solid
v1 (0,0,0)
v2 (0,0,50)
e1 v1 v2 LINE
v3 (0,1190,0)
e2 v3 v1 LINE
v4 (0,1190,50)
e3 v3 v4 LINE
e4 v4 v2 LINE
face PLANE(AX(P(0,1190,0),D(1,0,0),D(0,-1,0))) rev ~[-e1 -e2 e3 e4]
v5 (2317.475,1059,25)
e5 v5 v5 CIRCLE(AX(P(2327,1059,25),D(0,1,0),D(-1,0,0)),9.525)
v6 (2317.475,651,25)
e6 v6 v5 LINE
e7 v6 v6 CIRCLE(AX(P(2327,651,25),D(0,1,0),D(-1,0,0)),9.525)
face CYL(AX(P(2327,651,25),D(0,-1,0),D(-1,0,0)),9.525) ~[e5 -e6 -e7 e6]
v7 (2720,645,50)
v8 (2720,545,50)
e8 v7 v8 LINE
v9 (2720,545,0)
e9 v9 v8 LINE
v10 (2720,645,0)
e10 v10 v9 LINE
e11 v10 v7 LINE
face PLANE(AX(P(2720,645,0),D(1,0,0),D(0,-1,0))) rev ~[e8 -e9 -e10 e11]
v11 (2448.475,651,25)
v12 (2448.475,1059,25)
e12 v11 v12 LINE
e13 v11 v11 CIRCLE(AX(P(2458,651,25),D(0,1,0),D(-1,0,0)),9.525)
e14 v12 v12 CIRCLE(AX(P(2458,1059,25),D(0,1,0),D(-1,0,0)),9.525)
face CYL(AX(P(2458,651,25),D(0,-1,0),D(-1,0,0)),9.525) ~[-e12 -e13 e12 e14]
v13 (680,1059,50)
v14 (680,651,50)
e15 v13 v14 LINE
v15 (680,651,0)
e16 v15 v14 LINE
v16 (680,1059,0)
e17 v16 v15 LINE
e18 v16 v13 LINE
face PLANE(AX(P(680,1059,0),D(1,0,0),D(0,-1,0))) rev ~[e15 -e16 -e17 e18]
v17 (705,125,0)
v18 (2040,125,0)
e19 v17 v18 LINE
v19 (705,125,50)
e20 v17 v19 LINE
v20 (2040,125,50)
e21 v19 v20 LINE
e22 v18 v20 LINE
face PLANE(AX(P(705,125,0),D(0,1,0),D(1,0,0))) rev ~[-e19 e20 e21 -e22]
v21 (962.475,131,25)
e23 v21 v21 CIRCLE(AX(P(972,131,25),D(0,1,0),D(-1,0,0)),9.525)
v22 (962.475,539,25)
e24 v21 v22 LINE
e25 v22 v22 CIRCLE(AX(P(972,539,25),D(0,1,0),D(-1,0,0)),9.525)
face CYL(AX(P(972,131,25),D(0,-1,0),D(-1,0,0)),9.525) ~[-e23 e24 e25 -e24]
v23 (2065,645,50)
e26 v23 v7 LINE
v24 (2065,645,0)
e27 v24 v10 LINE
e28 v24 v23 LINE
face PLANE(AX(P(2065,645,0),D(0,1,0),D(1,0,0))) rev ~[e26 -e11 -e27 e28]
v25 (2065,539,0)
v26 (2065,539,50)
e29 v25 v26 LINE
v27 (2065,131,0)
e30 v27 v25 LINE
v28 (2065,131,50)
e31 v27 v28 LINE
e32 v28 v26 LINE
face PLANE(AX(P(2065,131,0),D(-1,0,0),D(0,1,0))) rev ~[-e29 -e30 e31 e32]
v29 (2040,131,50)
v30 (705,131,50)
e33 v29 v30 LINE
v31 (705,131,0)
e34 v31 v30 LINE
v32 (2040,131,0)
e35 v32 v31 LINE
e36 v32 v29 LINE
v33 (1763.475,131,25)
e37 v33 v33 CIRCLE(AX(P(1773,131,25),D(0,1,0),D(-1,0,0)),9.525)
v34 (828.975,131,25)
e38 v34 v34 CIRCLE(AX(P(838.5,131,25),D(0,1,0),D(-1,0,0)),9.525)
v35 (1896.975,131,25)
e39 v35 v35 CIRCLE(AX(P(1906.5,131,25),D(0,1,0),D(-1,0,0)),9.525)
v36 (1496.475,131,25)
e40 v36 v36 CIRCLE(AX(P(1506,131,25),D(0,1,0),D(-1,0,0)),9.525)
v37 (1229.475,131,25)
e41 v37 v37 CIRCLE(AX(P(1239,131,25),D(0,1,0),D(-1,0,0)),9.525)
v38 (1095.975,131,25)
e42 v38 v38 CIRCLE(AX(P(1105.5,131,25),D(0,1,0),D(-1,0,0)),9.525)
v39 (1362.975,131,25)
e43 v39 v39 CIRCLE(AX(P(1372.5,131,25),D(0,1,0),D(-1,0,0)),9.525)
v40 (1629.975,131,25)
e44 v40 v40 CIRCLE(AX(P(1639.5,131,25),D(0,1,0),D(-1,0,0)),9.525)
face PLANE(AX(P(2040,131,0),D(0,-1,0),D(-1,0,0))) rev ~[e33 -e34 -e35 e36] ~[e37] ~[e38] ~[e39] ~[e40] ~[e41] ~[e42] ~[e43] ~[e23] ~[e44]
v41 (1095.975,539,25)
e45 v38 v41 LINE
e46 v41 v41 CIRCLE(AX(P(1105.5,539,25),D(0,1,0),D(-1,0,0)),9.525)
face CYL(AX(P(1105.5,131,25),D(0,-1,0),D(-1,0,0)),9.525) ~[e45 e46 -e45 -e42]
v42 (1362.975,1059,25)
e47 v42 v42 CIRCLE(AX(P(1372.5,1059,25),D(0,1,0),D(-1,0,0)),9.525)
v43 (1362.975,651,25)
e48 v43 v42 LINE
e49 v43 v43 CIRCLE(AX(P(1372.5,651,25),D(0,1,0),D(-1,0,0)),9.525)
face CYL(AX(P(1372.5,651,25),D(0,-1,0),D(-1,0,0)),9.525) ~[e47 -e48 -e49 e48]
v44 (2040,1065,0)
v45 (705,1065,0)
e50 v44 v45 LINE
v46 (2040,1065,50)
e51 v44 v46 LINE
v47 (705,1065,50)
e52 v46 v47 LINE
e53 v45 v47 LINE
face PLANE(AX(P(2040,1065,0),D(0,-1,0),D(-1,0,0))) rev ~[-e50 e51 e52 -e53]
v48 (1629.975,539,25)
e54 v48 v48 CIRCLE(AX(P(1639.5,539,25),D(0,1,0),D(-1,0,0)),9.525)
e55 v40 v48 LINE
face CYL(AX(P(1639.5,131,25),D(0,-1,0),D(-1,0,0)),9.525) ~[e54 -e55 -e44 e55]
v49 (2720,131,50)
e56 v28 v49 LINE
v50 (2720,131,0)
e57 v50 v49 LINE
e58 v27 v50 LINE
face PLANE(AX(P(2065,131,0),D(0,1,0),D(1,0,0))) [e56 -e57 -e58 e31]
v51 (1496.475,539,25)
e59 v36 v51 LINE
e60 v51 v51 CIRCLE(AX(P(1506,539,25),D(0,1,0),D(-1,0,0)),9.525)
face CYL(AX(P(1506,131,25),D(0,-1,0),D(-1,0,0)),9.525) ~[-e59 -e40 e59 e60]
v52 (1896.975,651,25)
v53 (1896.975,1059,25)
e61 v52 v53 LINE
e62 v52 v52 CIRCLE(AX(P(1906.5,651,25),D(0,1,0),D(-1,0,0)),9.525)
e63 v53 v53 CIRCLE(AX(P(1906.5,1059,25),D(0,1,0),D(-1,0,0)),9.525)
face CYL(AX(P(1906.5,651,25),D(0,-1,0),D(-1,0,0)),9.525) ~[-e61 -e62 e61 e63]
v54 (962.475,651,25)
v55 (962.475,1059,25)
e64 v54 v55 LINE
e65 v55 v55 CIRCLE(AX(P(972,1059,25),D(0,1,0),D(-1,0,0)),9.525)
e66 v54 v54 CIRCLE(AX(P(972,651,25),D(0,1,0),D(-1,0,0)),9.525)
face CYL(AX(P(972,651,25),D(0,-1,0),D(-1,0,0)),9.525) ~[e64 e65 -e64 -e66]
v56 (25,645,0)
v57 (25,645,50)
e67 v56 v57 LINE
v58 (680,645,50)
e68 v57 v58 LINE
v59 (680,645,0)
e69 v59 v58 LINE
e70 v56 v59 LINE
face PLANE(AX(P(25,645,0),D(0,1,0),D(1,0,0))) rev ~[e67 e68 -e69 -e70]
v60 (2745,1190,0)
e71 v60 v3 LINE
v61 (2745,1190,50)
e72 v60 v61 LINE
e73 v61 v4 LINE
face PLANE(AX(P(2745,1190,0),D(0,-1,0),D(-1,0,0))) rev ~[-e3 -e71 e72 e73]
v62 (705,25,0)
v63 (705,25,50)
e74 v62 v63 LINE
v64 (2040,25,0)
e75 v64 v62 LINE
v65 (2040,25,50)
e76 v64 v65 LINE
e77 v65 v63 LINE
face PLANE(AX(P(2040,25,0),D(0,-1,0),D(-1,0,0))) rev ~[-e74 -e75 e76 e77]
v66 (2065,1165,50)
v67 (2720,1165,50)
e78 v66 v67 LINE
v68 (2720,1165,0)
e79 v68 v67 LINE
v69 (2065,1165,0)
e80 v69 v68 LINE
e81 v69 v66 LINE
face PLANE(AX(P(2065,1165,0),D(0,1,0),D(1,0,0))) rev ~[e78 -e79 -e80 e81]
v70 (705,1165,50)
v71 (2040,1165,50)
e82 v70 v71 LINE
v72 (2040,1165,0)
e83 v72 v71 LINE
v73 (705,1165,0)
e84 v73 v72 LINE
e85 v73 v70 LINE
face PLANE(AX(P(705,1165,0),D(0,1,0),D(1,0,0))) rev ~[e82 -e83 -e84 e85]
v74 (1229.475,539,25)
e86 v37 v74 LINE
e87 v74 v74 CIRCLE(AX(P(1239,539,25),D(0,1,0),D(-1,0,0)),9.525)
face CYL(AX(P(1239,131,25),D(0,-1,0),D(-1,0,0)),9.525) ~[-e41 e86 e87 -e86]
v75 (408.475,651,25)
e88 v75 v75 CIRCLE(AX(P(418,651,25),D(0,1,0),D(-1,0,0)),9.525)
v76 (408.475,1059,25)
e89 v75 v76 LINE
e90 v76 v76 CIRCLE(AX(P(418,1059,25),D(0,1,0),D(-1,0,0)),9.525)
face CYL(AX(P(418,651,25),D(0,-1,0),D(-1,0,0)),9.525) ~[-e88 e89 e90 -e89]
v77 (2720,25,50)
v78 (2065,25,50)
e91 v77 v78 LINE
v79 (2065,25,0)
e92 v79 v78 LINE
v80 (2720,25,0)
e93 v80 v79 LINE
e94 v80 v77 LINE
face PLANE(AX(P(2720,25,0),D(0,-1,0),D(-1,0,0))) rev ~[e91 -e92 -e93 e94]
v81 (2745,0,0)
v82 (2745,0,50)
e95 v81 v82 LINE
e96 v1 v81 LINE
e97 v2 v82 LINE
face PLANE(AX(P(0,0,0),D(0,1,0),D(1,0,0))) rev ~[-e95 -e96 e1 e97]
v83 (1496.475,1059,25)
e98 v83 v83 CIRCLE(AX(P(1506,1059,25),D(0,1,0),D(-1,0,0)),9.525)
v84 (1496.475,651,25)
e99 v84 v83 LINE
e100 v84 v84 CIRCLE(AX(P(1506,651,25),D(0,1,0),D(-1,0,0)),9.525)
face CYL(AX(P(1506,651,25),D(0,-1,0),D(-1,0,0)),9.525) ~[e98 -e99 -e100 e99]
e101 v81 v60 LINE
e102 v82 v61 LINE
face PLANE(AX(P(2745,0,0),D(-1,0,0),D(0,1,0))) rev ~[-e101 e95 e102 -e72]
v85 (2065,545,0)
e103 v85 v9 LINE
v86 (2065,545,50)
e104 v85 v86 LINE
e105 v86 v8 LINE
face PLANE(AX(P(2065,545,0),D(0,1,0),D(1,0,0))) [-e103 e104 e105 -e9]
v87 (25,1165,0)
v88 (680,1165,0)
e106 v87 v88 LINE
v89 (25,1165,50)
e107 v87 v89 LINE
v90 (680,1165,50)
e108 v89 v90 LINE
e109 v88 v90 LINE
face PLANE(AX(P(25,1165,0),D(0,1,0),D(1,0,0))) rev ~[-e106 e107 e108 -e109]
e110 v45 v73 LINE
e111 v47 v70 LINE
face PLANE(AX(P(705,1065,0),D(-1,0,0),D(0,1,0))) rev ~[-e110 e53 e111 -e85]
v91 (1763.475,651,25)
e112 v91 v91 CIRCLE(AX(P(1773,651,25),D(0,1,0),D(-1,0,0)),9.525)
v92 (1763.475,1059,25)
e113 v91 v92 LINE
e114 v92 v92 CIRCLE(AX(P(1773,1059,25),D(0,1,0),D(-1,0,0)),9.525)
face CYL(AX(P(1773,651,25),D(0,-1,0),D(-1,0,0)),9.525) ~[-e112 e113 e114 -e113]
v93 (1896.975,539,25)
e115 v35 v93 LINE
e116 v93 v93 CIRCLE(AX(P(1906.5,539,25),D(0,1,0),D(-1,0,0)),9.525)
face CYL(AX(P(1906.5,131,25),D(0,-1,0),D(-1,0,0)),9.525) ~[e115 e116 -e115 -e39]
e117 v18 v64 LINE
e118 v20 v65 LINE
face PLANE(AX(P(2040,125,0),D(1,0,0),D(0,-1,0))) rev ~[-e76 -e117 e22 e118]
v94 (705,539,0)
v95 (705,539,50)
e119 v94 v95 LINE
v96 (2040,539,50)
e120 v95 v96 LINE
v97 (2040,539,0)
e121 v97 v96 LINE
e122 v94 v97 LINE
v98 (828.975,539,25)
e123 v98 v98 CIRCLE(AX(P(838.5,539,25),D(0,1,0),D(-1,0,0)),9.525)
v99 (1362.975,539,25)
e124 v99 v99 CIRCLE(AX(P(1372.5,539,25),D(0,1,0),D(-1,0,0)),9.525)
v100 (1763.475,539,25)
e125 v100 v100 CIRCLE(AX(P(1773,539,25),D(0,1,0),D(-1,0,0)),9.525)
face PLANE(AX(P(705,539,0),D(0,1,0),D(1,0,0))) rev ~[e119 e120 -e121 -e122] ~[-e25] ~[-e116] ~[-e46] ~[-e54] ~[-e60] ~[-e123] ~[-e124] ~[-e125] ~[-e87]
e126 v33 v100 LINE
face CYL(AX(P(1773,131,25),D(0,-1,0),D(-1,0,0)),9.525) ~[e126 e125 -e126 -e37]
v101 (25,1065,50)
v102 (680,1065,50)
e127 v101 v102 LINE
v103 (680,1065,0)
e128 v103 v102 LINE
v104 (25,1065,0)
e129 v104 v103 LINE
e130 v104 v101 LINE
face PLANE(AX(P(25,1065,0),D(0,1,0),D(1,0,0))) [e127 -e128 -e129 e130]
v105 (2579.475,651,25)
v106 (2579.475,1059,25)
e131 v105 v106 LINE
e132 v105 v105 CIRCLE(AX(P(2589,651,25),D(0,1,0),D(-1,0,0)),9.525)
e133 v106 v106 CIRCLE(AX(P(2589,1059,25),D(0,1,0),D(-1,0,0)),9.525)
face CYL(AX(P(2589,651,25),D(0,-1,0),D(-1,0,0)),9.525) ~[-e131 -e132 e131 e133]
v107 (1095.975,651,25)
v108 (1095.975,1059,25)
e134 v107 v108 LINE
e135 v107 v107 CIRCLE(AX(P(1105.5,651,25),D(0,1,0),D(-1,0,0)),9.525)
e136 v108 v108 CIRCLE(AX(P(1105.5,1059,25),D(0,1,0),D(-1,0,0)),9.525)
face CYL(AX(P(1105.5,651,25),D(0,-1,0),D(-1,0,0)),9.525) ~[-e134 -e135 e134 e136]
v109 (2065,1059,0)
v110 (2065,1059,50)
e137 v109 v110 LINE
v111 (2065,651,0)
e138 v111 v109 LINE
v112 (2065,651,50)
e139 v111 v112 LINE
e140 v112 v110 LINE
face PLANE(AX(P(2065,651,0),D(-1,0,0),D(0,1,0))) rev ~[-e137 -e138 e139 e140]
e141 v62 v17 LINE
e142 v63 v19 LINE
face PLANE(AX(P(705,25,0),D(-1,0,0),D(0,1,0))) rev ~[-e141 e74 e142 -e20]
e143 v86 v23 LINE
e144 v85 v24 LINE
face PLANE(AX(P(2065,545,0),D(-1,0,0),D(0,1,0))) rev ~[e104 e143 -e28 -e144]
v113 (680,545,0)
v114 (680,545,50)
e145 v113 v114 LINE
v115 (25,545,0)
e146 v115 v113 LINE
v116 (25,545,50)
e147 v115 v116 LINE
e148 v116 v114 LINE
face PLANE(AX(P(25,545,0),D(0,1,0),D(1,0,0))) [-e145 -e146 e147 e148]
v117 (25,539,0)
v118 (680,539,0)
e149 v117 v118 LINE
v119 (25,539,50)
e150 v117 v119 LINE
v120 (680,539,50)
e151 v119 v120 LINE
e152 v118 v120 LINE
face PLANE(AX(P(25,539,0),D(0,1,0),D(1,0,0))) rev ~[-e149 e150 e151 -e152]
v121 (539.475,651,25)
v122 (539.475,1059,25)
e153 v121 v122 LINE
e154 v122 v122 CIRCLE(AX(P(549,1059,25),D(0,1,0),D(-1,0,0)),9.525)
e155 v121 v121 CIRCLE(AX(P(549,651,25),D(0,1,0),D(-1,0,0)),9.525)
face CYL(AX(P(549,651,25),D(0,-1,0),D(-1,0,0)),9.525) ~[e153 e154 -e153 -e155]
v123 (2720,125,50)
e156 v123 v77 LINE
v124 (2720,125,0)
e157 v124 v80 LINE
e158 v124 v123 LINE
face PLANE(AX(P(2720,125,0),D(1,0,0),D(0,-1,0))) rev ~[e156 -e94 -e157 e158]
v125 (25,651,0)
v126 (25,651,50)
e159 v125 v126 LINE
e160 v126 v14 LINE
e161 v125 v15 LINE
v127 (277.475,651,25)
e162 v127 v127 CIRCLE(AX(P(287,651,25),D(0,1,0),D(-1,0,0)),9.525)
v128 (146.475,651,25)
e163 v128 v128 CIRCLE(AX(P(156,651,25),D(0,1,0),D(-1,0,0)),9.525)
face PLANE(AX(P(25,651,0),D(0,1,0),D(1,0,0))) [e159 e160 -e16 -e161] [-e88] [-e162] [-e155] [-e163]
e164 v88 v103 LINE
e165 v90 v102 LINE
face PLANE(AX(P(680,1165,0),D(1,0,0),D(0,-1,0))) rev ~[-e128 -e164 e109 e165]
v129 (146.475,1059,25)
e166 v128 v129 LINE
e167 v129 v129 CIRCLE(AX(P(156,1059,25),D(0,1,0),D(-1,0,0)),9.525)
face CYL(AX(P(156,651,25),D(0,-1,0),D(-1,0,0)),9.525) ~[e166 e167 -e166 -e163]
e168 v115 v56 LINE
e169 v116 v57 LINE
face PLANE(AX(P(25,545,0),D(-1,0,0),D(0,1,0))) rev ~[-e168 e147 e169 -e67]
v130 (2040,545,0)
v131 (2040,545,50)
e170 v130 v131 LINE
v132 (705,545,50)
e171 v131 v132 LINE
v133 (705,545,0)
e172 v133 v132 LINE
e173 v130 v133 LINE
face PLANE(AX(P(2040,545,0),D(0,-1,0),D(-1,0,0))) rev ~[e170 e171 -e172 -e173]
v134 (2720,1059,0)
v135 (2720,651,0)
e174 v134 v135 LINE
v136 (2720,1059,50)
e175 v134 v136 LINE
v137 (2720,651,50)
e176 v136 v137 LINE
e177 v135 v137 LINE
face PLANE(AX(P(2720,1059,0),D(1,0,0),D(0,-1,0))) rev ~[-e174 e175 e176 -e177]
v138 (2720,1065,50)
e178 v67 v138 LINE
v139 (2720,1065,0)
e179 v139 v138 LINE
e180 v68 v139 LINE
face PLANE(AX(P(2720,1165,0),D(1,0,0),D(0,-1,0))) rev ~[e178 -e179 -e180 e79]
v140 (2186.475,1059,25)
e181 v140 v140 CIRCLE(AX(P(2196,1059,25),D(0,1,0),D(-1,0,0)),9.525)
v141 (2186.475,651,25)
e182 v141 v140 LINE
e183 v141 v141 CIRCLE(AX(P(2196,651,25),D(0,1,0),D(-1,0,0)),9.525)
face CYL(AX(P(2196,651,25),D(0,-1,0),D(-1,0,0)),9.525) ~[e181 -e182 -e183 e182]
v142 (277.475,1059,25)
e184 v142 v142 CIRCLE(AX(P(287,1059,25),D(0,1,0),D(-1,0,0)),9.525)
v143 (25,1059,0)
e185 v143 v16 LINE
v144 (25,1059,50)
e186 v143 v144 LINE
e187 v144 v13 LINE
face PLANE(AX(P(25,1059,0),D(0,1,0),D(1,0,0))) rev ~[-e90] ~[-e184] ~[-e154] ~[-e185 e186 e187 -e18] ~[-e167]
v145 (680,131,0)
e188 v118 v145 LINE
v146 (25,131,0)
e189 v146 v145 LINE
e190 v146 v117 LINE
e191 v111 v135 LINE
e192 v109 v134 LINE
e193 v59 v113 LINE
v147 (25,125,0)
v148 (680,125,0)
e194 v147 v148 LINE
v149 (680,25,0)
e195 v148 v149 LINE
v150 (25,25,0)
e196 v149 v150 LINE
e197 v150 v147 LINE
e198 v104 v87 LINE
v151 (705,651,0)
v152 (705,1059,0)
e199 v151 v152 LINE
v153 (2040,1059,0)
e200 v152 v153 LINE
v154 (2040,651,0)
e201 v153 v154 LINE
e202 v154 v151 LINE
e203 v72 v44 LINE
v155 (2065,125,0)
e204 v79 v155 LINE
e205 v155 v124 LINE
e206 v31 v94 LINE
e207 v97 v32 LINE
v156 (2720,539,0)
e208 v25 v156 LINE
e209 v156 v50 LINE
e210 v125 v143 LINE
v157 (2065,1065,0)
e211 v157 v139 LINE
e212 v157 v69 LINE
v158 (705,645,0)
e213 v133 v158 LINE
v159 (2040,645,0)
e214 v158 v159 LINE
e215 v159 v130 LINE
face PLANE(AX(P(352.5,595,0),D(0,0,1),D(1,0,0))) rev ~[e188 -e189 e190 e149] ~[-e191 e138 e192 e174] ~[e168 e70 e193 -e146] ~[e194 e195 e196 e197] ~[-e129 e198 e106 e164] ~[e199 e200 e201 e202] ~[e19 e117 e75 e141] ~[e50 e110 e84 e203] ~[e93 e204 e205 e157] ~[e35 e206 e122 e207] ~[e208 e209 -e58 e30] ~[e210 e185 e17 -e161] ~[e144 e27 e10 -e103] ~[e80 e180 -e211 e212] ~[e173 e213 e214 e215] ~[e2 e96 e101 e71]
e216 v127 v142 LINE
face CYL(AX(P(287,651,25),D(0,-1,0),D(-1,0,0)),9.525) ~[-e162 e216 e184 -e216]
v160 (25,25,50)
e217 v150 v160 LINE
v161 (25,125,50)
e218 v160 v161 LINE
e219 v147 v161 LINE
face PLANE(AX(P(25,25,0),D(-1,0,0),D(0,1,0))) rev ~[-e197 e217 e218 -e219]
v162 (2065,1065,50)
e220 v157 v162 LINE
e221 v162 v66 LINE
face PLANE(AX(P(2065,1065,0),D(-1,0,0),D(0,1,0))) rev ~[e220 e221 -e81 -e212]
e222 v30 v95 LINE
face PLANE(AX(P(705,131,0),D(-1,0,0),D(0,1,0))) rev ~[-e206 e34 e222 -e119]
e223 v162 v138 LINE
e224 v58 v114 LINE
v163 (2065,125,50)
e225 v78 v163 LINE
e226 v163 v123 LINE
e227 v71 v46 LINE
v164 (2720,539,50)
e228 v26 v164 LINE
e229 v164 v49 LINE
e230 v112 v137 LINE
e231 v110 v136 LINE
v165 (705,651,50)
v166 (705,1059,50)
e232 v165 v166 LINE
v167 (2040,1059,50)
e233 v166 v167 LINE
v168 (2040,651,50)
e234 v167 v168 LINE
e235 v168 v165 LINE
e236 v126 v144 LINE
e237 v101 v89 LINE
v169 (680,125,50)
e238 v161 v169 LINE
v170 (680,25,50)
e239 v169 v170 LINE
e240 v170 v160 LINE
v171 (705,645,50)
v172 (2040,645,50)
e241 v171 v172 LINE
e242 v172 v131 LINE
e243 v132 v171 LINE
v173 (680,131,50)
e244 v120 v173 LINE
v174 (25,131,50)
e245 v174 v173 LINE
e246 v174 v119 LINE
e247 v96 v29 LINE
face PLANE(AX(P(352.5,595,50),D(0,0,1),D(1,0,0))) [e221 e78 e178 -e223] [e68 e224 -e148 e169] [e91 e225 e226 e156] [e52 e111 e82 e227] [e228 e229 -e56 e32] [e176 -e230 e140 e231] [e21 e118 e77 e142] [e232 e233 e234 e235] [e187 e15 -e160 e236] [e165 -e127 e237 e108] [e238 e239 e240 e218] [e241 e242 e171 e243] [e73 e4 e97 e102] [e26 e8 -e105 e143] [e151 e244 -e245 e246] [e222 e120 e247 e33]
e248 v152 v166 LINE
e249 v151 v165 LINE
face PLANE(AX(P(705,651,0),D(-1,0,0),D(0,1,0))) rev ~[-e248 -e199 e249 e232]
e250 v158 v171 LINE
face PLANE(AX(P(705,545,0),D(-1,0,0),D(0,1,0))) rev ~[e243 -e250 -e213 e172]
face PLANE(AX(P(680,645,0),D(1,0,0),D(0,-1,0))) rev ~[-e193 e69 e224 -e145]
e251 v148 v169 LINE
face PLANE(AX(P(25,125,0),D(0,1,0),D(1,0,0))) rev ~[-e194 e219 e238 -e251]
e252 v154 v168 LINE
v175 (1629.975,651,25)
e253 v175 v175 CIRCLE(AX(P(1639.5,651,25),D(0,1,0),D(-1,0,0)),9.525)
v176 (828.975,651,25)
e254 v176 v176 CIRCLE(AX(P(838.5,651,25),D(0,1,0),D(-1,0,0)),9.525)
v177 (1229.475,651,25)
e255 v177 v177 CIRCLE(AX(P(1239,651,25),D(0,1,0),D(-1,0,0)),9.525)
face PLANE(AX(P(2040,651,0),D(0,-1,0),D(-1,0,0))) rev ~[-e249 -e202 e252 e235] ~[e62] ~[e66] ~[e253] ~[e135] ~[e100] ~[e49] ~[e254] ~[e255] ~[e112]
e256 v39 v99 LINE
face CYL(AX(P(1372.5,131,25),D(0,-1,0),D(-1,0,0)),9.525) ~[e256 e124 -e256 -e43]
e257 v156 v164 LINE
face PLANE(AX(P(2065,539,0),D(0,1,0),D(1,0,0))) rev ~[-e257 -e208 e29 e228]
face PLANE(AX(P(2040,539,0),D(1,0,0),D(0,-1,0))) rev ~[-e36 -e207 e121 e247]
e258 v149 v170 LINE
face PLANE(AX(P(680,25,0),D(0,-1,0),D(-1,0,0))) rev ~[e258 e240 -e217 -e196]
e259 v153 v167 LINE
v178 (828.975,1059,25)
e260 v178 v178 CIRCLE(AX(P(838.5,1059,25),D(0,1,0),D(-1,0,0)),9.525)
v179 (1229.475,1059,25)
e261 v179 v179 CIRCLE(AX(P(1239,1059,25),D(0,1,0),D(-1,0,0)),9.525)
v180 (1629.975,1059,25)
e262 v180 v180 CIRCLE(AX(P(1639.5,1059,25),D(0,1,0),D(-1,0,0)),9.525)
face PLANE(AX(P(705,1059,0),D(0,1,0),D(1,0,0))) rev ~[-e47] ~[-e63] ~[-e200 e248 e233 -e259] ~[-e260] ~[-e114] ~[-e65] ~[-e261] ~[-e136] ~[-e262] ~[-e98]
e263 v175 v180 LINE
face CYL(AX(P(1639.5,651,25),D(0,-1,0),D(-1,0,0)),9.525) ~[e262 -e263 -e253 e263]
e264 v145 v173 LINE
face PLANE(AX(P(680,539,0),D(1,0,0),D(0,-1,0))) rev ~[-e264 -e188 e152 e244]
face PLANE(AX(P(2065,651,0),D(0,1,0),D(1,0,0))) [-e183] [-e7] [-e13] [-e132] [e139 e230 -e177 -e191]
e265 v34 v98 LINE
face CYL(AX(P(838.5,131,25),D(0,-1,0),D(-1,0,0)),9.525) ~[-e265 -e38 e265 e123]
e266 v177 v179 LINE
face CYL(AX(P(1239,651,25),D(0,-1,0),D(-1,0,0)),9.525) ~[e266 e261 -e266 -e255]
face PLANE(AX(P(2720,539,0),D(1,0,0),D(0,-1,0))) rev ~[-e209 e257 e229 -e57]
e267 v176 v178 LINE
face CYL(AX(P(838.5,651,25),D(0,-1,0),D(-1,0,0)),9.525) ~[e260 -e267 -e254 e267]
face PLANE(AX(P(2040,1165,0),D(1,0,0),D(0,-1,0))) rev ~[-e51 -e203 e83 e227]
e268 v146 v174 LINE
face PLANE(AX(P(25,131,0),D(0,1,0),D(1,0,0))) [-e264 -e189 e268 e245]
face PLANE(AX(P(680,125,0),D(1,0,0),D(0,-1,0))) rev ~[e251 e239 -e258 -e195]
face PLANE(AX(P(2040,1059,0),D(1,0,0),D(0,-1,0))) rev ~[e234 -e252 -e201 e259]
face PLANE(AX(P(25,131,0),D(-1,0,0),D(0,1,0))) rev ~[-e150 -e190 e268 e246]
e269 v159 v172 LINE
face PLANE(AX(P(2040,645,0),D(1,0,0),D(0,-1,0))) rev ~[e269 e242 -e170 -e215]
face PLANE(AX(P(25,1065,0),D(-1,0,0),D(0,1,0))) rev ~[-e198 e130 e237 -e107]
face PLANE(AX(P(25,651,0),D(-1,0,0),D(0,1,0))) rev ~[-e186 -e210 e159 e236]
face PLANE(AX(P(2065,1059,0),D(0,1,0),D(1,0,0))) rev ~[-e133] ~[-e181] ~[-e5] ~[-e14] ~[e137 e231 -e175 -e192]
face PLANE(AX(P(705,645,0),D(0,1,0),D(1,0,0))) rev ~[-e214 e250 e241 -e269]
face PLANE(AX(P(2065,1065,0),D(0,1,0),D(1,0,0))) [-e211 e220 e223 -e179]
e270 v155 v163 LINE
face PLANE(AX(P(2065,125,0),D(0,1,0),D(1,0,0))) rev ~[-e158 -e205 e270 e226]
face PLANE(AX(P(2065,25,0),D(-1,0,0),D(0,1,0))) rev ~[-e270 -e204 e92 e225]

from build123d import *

# Parameters (mm, degrees)
F0_W     = 655
F0_H     = 6
F0_W_2   = 25
F1_DEPTH = 50
F4_R     = 9.525
F5_DEPTH = 408
F6_R     = 9.525
F7_DEPTH = 408
F8_R     = 9.525
F9_DEPTH = 408


# Not quite as in the source:
# - a feature names something its author has since deleted; it is built from what else it names
# - the program builds the solid bodies; features that only make, move or delete a surface that nothing else refers to are left out


with BuildPart() as f1:
    # F0 (on Top) → F1 (new body)
    with BuildSketch(Plane.XY):
        Polygon((0, 1190), (0, 0), (680, 0), (705, 0), (705, 25), (705, 125), (705, 131), (705, 539), (705, 545), (705, 645), (705, 651), (705, 1059), (705, 1065), (705, 1165), (705, 1190), (680, 1190), align=None)
        Polygon((25, 1065), (25, 1165), (680, 1165), (680, 1065), (680, 1059), (680, 651), (680, 645), (680, 545), (680, 539), (680, 131), (680, 125), (680, 25), (25, 25), (25, 125), (25, 131), (25, 539), (25, 545), (25, 645), (25, 651), (25, 1059), align=None, mode=Mode.SUBTRACT)
        Polygon((705, 25), (705, 0), (1360, 0), (1385, 0), (2040, 0), (2065, 0), (2065, 25), (2065, 125), (2065, 131), (2065, 539), (2065, 545), (2065, 645), (2065, 651), (2065, 1059), (2065, 1065), (2065, 1165), (2065, 1190), (2040, 1190), (1385, 1190), (1360, 1190), (705, 1190), (705, 1165), (1360, 1165), (1385, 1165), (2040, 1165), (2040, 1065), (2040, 1059), (2040, 651), (2040, 645), (2040, 545), (2040, 539), (2040, 131), (2040, 125), (2040, 25), (1385, 25), (1360, 25), align=None)
        Polygon((2065, 25), (2065, 0), (2745, 0), (2745, 1190), (2065, 1190), (2065, 1165), (2720, 1165), (2720, 1065), (2720, 1059), (2720, 651), (2720, 645), (2720, 545), (2720, 539), (2720, 131), (2720, 125), (2720, 25), align=None)
        with Locations((352.5, 542)):
            Rectangle(F0_W, F0_H)
        with Locations((352.5, 128)):
            Rectangle(F0_W, F0_H)
        with Locations((352.5, 648)):
            Rectangle(F0_W, F0_H)
        with Locations((352.5, 1062)):
            Rectangle(F0_W, F0_H)
        with Locations((1032.5, 648)):
            Rectangle(F0_W, F0_H)
        with Locations((1712.5, 648)):
            Rectangle(F0_W, F0_H)
        with Locations((1712.5, 542)):
            Rectangle(F0_W, F0_H)
        with Locations((1032.5, 542)):
            Rectangle(F0_W, F0_H)
        with Locations((2392.5, 542)):
            Rectangle(F0_W, F0_H)
        with Locations((2392.5, 648)):
            Rectangle(F0_W, F0_H)
        with Locations((2392.5, 1062)):
            Rectangle(F0_W, F0_H)
        with Locations((1712.5, 1062)):
            Rectangle(F0_W, F0_H)
        with Locations((1032.5, 1062)):
            Rectangle(F0_W, F0_H)
        with Locations((2392.5, 128)):
            Rectangle(F0_W, F0_H)
        with Locations((1032.5, 128)):
            Rectangle(F0_W, F0_H)
        with Locations((1712.5, 128)):
            Rectangle(F0_W, F0_H)
        with Locations((1372.5, 128)):
            Rectangle(F0_W_2, F0_H)
        with Locations((1372.5, 542)):
            Rectangle(F0_W_2, F0_H)
        with Locations((1372.5, 1062)):
            Rectangle(F0_W_2, F0_H)
        with Locations((1372.5, 648)):
            Rectangle(F0_W_2, F0_H)
    extrude(amount=F1_DEPTH)

    # F4 (on face) → F5 (join, through all)
    with BuildSketch(Plane(origin=(0, 651, 0), x_dir=(-1, 0, 0), z_dir=(0, 1, 0))):
        with Locations((-156, 25)):
            Circle(F4_R)
        with Locations((-287, 25)):
            Circle(F4_R)
        with Locations((-418, 25)):
            Circle(F4_R)
        with Locations((-549, 25)):
            Circle(F4_R)
        with Locations((-2196, 25)):
            Circle(F4_R)
        with Locations((-2327, 25)):
            Circle(F4_R)
        with Locations((-2458, 25)):
            Circle(F4_R)
        with Locations((-2589, 25)):
            Circle(F4_R)
    extrude(amount=F5_DEPTH)

    # F6 (on face) → F7 (join, through all)
    with BuildSketch(Plane(origin=(0, 131, 0), x_dir=(-1, 0, 0), z_dir=(0, 1, 0))):
        with Locations((-838.5, 25)):
            Circle(F6_R)
        with Locations((-972, 25)):
            Circle(F6_R)
        with Locations((-1105.5, 25)):
            Circle(F6_R)
        with Locations((-1239, 25)):
            Circle(F6_R)
        with Locations((-1372.5, 25)):
            Circle(F6_R)
        with Locations((-1506, 25)):
            Circle(F6_R)
        with Locations((-1639.5, 25)):
            Circle(F6_R)
        with Locations((-1773, 25)):
            Circle(F6_R)
        with Locations((-1906.5, 25)):
            Circle(F6_R)
    extrude(amount=F7_DEPTH)

    # F8 (on face) → F9 (join, through all)
    with BuildSketch(Plane(origin=(0, 651, 0), x_dir=(-1, 0, 0), z_dir=(0, 1, 0))):
        with Locations((-838.5, 25)):
            Circle(F8_R)
        with Locations((-972, 25)):
            Circle(F8_R)
        with Locations((-1105.5, 25)):
            Circle(F8_R)
        with Locations((-1239, 25)):
            Circle(F8_R)
        with Locations((-1372.5, 25)):
            Circle(F8_R)
        with Locations((-1506, 25)):
            Circle(F8_R)
        with Locations((-1639.5, 25)):
            Circle(F8_R)
        with Locations((-1773, 25)):
            Circle(F8_R)
        with Locations((-1906.5, 25)):
            Circle(F8_R)
    extrude(amount=F9_DEPTH)


solid = f1.part
